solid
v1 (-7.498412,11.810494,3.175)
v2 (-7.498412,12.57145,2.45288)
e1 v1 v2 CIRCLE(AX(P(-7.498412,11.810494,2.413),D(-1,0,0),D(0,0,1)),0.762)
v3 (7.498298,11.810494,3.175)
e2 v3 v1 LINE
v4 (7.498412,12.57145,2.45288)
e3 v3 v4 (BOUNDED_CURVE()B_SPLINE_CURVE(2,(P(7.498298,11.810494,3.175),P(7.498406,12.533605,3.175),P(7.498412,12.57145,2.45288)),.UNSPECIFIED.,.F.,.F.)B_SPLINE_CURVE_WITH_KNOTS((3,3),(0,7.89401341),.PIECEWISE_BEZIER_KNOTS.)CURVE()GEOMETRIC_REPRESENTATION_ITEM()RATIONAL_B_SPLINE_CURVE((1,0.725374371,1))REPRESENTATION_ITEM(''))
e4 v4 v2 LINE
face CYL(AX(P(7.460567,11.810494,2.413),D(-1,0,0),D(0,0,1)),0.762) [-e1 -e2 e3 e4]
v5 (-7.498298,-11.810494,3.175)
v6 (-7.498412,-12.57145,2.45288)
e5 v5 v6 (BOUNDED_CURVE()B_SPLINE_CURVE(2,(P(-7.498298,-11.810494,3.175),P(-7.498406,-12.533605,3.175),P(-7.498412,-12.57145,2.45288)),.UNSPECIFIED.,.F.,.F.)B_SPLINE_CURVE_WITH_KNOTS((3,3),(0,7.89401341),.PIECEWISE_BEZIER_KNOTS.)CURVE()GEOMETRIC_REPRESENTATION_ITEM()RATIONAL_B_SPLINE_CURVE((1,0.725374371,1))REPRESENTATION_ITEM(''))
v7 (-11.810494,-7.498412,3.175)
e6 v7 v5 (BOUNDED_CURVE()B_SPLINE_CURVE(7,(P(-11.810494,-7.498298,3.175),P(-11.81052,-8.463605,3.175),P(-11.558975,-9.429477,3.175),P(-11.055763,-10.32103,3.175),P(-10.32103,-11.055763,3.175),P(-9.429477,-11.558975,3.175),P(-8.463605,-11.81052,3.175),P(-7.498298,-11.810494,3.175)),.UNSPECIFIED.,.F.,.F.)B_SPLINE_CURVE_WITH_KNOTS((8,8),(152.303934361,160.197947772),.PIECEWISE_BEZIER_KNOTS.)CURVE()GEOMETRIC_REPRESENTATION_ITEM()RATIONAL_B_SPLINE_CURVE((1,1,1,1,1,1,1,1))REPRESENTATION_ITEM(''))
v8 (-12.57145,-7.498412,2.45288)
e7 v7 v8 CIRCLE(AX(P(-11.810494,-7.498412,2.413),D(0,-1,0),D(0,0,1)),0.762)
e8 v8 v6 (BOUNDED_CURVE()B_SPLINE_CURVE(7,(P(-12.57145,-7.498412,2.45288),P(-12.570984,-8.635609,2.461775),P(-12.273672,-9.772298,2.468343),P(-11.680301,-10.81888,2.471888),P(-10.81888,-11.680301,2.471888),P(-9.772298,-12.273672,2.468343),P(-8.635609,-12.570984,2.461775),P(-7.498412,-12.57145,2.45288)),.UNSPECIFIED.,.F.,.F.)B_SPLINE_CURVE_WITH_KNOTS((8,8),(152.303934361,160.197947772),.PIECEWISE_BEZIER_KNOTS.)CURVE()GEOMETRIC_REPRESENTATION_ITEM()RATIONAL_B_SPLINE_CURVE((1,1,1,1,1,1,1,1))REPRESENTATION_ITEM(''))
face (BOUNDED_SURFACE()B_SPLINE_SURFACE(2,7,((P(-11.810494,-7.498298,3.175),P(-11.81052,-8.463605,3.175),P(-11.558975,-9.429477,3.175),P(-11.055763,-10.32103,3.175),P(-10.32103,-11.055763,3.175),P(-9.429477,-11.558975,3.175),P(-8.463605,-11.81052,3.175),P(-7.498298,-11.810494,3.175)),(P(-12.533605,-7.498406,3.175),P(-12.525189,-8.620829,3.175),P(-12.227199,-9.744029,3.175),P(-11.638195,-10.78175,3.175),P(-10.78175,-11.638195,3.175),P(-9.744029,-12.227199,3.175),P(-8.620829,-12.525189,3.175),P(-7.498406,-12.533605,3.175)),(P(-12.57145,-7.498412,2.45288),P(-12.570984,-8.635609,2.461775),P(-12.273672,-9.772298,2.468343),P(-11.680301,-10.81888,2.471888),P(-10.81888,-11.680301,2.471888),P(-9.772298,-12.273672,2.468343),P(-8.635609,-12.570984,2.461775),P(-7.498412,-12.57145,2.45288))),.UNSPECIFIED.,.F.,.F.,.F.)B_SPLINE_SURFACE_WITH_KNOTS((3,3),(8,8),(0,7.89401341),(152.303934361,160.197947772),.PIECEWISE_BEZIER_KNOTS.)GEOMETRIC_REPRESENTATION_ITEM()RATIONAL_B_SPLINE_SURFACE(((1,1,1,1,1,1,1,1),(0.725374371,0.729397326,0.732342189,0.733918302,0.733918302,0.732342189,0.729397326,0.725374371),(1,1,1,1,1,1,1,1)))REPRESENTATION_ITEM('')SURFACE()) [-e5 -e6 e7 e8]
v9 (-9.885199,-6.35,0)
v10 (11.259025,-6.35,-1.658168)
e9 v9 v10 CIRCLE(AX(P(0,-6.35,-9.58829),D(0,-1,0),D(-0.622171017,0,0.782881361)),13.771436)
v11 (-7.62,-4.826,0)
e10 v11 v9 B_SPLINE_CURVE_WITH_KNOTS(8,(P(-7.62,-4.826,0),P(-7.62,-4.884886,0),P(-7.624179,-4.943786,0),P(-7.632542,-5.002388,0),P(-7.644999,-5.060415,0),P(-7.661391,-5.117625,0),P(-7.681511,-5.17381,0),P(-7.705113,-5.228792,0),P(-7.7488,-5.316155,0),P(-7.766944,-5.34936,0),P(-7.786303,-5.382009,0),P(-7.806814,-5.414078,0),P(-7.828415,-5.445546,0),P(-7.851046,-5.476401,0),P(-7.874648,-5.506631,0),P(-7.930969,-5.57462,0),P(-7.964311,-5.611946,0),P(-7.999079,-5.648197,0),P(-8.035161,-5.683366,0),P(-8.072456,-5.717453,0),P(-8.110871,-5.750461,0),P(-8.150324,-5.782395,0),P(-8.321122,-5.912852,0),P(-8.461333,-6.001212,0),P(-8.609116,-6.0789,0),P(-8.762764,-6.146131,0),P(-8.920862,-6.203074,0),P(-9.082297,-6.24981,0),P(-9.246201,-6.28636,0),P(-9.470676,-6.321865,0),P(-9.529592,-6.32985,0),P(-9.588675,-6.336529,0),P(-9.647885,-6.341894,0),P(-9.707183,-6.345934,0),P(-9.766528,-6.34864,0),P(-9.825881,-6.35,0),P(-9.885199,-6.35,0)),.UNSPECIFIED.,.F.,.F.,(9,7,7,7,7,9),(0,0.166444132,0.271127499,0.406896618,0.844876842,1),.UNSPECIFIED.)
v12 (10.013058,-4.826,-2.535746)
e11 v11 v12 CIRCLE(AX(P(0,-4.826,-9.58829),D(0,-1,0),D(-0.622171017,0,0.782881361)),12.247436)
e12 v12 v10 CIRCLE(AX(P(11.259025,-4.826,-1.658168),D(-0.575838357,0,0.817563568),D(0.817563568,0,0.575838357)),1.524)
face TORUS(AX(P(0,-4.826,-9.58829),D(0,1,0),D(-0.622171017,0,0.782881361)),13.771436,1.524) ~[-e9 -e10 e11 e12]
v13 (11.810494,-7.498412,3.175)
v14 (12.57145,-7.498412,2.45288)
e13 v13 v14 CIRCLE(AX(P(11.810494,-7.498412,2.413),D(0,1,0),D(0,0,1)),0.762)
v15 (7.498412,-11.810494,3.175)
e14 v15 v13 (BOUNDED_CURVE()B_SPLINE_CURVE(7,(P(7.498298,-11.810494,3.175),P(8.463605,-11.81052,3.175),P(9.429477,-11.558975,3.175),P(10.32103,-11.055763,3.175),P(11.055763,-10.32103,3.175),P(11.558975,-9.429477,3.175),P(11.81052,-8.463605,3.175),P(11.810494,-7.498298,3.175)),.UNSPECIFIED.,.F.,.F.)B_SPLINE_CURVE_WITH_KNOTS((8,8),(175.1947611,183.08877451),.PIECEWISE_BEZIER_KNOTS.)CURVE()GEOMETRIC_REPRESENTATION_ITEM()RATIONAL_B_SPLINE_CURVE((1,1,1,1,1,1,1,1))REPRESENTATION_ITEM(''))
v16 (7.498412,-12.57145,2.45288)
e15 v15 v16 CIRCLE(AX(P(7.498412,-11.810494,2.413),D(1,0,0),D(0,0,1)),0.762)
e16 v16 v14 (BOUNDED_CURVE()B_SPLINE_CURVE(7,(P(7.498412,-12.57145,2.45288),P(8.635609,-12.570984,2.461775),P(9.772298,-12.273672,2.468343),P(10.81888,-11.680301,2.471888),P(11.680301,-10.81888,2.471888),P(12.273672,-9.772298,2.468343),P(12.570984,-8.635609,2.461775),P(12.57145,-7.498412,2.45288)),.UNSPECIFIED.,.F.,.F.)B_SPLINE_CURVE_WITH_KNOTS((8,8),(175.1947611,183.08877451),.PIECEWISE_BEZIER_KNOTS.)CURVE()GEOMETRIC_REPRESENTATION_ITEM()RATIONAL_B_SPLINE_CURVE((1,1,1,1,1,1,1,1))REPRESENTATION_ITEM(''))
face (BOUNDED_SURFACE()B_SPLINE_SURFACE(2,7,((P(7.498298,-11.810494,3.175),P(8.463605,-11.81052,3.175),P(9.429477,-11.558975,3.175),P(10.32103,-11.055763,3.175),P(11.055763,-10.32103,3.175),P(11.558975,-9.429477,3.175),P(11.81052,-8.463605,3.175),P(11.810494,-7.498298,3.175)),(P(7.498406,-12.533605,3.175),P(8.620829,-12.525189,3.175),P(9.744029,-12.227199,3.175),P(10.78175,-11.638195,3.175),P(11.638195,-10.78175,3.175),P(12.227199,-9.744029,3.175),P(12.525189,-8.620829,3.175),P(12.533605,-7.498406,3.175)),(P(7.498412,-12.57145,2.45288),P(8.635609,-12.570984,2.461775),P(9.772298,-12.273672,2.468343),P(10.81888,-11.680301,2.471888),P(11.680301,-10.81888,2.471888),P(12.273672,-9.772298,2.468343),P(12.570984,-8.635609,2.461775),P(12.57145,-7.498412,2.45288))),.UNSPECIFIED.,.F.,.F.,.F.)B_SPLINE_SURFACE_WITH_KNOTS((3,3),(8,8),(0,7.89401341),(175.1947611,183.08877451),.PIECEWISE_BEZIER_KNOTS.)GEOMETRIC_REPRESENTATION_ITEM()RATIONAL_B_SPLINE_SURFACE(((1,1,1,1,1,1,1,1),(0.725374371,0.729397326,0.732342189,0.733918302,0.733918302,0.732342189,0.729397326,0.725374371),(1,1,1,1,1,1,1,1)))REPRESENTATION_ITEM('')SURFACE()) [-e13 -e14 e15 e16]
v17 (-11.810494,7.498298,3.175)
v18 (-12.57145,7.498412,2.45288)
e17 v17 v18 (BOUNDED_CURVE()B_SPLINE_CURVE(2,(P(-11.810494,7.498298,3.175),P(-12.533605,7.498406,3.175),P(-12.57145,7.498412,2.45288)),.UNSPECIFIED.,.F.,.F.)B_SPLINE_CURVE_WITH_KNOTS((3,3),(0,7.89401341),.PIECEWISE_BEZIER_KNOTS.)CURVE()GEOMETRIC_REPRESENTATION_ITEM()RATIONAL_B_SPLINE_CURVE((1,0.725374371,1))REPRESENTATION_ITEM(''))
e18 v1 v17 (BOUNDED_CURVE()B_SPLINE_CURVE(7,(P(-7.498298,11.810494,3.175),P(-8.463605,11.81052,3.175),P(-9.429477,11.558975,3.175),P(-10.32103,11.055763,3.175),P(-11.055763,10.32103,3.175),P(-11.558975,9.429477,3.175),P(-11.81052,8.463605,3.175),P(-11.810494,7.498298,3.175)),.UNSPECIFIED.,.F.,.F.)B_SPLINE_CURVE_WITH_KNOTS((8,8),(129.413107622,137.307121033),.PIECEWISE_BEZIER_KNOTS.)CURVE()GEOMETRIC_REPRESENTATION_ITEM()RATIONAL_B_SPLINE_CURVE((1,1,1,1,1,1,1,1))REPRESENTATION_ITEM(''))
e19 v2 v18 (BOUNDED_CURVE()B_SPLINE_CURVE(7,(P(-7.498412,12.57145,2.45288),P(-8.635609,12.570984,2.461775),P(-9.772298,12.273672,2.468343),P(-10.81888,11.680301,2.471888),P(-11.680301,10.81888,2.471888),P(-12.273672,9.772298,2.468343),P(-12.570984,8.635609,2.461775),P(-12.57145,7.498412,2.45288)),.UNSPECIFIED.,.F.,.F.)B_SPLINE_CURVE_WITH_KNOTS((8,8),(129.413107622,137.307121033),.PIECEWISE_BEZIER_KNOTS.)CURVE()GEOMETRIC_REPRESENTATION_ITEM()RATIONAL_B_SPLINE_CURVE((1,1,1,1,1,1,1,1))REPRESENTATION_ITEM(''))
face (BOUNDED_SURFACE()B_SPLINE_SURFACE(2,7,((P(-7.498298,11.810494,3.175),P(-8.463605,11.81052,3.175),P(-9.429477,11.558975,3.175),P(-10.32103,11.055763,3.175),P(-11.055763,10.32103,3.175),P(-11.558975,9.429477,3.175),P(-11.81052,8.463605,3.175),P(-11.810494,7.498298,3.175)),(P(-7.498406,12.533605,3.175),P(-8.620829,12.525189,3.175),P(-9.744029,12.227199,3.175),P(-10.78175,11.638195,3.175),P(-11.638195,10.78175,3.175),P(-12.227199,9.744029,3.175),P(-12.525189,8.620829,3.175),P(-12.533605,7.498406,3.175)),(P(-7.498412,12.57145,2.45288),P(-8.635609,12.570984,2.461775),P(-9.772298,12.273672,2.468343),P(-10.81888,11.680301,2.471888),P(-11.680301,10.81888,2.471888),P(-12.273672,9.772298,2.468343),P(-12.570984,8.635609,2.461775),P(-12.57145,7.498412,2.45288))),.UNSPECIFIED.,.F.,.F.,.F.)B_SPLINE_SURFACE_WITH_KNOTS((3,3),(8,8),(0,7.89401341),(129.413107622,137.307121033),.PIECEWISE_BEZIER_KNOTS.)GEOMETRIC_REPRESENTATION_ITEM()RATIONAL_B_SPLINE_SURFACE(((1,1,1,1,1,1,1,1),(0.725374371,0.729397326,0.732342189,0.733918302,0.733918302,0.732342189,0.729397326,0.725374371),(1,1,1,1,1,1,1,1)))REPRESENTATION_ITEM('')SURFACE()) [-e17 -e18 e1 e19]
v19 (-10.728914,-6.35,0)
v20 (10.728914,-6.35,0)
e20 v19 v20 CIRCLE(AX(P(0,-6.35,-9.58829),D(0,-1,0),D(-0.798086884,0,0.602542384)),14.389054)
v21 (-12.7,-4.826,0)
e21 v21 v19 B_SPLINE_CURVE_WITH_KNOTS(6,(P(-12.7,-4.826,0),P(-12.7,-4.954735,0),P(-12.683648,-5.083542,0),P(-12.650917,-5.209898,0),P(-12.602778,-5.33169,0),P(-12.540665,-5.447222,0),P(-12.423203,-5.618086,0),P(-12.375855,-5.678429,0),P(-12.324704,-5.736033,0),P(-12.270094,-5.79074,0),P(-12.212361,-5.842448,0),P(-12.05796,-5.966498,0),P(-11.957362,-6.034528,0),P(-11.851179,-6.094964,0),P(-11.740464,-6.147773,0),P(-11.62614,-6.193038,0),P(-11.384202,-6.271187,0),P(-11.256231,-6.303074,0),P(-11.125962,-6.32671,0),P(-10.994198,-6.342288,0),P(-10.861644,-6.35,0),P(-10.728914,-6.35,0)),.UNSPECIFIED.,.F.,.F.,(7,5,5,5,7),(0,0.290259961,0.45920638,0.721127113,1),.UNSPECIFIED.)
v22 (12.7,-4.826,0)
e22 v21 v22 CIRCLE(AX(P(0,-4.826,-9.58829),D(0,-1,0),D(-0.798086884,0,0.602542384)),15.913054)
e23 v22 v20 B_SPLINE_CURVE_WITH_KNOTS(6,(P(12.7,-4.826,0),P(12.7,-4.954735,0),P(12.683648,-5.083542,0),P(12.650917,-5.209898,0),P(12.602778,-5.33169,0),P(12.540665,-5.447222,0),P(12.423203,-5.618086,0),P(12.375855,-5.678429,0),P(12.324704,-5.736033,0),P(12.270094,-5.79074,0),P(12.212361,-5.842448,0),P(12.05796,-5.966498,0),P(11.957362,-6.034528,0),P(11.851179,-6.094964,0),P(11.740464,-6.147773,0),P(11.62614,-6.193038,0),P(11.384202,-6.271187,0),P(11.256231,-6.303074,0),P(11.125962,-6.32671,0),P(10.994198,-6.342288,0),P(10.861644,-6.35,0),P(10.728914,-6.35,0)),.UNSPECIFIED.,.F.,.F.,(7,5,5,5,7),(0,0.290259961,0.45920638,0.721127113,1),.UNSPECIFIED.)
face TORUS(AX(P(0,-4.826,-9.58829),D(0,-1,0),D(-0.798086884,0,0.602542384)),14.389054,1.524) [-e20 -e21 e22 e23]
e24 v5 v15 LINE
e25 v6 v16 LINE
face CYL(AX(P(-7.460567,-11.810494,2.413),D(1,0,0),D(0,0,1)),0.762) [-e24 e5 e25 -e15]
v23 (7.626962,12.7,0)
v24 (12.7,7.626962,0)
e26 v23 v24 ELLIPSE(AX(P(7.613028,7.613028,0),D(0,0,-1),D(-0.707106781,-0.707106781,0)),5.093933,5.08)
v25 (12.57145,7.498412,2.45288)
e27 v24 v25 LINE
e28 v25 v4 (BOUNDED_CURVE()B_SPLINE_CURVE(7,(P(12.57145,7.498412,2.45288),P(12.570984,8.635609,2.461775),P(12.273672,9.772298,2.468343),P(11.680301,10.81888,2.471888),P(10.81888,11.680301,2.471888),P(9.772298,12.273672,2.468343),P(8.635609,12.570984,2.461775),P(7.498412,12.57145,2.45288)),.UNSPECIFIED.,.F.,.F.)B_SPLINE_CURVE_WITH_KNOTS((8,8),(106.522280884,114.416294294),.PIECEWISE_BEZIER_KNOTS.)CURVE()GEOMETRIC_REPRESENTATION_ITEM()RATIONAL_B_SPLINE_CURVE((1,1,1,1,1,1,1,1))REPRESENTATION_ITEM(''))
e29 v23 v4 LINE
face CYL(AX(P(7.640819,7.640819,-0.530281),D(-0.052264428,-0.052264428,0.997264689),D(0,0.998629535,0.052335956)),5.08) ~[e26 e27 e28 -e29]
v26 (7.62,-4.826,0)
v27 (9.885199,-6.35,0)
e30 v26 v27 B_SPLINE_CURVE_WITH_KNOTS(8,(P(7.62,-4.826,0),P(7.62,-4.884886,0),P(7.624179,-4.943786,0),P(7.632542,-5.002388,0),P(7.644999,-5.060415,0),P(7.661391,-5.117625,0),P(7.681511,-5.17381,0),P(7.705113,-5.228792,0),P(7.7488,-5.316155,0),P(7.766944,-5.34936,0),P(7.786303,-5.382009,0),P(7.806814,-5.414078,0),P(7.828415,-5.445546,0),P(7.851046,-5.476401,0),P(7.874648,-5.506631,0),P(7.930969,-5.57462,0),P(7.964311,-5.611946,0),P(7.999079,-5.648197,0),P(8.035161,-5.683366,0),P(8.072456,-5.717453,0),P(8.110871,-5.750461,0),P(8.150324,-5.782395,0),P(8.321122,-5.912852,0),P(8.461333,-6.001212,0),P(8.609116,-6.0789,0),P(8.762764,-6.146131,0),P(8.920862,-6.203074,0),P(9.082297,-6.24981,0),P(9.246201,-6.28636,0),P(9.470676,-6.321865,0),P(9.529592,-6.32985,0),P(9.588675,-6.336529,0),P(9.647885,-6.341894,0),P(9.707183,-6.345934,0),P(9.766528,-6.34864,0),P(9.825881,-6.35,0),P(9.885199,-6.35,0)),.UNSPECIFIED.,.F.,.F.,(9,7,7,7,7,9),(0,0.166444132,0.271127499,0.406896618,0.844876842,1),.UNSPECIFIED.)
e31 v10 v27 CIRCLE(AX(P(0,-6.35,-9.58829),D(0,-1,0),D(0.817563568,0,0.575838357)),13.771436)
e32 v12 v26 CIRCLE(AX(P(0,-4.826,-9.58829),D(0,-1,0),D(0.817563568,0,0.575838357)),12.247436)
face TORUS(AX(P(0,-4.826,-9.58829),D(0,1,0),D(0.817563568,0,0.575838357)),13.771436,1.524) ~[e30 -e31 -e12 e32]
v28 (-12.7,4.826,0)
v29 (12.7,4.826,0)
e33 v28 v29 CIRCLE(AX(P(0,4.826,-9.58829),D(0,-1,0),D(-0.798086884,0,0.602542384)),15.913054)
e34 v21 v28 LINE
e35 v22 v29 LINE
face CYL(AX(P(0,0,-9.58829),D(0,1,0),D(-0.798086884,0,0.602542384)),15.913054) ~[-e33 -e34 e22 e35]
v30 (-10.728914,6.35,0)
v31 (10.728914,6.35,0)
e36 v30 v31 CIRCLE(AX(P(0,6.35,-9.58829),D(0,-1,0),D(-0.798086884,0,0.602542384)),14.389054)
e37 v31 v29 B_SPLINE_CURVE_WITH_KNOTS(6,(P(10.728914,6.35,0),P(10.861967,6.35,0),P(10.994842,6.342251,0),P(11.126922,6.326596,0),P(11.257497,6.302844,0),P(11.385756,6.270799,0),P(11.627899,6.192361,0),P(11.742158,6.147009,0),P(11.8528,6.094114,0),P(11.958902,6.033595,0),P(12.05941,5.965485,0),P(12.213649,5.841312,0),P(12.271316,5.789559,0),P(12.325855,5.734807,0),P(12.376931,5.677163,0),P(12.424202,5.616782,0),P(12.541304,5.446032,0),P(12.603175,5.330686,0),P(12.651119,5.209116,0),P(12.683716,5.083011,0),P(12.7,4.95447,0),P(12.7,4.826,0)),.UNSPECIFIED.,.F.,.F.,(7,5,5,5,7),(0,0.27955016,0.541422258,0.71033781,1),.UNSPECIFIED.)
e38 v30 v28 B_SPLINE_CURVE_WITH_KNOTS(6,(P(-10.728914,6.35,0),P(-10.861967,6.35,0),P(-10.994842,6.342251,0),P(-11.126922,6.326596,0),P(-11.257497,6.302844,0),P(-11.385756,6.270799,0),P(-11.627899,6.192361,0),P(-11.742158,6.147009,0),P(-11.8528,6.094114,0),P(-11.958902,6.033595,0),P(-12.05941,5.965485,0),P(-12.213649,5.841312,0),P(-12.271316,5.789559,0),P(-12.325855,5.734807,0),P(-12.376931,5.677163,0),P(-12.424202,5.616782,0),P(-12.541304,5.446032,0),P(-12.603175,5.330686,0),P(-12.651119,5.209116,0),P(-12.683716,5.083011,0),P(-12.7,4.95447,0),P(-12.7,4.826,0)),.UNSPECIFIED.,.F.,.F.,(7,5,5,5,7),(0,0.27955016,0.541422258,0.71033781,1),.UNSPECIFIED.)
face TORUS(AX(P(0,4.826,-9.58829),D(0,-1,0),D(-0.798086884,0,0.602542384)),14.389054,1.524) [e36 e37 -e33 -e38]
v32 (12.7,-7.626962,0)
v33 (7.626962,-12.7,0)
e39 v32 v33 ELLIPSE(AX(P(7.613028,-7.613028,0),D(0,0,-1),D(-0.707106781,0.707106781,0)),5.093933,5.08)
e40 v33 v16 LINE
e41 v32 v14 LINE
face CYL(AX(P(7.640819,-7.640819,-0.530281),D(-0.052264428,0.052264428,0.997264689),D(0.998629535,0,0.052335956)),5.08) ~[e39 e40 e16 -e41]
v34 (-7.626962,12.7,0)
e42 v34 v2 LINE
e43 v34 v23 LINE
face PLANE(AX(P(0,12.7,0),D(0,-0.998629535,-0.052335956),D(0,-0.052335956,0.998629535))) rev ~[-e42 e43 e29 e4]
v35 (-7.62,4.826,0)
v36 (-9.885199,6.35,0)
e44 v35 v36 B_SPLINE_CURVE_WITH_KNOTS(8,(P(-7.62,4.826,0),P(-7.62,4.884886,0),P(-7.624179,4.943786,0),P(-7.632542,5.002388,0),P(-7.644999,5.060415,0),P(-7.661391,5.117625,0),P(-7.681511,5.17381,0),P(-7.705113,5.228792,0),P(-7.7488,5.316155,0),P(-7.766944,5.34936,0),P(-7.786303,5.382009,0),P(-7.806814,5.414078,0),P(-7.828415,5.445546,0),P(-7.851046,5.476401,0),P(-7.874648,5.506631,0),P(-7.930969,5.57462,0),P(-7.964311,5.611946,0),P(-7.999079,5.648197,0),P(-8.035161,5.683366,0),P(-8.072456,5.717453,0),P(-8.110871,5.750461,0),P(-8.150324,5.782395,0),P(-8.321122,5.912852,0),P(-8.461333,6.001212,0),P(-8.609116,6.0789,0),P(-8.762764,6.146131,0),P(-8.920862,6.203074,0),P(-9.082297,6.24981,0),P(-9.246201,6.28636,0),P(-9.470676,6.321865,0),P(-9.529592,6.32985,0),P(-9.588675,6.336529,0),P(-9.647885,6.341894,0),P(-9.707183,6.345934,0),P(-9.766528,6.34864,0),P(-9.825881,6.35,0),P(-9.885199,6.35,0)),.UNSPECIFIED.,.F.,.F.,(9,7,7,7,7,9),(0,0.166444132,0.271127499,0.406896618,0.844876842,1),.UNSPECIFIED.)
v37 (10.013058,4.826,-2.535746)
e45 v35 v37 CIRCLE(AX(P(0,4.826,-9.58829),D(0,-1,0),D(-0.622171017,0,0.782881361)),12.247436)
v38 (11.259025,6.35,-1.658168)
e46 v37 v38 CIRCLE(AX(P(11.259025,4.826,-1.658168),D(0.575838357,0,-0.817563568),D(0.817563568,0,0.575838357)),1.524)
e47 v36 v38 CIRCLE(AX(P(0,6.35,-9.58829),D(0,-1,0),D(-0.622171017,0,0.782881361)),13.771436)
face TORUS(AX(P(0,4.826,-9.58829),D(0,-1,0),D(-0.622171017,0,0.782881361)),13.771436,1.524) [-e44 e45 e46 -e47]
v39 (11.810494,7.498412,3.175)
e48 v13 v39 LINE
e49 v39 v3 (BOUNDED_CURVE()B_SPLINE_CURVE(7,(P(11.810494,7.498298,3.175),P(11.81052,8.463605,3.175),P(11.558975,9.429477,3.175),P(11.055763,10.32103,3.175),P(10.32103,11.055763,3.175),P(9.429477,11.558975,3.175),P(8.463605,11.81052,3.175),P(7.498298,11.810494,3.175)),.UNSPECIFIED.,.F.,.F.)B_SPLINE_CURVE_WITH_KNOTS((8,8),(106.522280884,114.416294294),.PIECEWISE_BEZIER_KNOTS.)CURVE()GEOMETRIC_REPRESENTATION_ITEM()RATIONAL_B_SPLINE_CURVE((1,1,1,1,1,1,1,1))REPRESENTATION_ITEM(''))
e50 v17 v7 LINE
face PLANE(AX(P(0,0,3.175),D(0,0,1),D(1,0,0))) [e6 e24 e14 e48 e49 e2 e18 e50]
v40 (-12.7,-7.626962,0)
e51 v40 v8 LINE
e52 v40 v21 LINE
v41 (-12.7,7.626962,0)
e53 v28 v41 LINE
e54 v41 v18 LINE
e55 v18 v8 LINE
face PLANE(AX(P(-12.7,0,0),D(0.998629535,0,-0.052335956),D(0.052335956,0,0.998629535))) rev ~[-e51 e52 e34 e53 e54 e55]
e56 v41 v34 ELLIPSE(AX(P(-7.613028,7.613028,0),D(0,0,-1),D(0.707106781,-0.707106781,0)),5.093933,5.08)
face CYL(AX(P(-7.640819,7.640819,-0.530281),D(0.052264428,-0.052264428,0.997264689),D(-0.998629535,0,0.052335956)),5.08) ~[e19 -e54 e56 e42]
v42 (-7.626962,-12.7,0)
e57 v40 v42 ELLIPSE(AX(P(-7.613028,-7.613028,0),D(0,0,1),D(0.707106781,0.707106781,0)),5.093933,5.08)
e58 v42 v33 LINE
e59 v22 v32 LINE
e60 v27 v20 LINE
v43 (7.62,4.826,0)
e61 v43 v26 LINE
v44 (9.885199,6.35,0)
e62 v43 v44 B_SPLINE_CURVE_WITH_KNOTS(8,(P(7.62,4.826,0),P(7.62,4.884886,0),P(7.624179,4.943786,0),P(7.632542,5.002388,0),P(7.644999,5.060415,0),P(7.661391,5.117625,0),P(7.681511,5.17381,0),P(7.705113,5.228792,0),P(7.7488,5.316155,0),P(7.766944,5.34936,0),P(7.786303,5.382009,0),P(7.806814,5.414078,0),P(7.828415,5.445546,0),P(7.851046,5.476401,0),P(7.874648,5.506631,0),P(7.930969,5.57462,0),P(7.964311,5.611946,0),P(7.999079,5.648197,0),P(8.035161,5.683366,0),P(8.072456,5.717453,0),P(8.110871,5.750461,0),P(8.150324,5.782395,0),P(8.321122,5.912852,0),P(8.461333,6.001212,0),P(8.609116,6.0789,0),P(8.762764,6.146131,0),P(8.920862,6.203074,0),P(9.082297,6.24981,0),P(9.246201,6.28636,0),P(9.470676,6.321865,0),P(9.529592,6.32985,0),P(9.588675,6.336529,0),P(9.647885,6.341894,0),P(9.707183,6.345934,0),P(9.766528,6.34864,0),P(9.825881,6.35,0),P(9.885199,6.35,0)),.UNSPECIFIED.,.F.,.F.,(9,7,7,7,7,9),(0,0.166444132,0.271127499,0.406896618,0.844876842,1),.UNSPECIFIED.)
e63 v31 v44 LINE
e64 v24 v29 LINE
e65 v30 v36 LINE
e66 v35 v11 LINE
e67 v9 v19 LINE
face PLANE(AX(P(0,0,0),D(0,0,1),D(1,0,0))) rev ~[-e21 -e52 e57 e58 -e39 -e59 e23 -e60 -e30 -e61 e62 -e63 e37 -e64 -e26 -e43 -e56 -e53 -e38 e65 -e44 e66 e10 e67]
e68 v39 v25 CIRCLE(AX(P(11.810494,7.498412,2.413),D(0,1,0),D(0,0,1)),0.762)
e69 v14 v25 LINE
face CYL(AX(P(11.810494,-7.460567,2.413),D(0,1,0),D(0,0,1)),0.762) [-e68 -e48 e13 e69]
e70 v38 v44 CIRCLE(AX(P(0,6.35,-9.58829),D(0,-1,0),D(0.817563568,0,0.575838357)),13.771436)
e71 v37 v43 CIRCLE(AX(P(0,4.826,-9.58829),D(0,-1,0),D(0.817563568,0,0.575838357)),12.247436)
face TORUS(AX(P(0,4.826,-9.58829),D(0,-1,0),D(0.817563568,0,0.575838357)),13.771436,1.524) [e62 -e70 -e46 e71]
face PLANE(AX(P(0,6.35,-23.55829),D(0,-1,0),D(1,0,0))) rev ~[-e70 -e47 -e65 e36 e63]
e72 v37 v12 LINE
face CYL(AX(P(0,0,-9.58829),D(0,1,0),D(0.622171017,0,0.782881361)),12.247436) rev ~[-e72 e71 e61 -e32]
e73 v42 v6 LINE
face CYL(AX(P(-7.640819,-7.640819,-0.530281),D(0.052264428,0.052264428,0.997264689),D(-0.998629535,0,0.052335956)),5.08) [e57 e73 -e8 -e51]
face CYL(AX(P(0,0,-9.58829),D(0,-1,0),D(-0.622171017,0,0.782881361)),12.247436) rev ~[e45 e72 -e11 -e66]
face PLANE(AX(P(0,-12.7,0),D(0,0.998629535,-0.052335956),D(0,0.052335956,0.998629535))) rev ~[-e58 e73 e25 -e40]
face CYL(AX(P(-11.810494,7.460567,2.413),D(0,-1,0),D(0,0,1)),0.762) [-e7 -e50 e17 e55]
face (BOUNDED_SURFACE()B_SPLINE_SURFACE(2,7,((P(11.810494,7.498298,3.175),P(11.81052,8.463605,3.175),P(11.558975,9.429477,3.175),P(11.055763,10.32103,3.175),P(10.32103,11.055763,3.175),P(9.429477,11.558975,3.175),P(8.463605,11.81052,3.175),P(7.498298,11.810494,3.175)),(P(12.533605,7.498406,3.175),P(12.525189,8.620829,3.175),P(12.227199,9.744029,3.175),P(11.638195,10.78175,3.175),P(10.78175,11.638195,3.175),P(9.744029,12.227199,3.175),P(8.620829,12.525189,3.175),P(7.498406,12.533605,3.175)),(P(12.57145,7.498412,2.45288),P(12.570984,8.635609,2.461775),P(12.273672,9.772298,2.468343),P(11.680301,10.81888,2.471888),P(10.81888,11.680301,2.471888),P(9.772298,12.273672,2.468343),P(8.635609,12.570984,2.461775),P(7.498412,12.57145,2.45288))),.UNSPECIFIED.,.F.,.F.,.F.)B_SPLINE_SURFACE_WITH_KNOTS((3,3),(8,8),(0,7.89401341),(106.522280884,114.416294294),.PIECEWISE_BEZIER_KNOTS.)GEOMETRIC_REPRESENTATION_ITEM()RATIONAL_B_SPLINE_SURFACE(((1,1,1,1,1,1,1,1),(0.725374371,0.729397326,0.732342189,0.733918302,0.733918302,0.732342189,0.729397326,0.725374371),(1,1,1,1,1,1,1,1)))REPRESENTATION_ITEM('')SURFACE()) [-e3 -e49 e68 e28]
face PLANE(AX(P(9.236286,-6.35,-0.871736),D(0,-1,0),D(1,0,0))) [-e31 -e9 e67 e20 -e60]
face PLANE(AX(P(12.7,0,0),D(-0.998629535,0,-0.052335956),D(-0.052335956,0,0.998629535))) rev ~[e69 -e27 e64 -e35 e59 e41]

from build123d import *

# Parameters (mm, degrees)
F0_W          = 25.4
F0_H          = 25.4
F1_DEPTH      = 3.175
F1_TAPER      = 3
F3_W          = 5.08
F3_H          = 12.7
F6_DEPTH      = 6.35
F6_DEPTH_BACK = 6.35
F7_R          = 5.08
F8_R          = 1.524
F9_R          = 0.762


with BuildPart() as f1:
    # F0 (on Top) → F1 (new body)
    with BuildSketch(Plane.XY):
        Rectangle(F0_W, F0_H)
    extrude(amount=F1_DEPTH, taper=F1_TAPER)

    # F4: sweep along a path in F2
    with BuildLine(Plane.XZ) as f4_path:
        ThreePointArc((-10.16, 0), (0, -23.5582897328), (10.16, 0))
    # F3 (on face) → F4 (sweep)
    with BuildSketch(Plane(origin=(0, 0, 0), x_dir=(1, 0, 0), z_dir=(0, 0, -1))):
        with Locations((-10.16, 0)):
            Rectangle(F3_W, F3_H)
    sweep(path=f4_path.line)

    # F5 (on Front) → F6 (join, two sides)
    with BuildSketch(Plane.XZ) as f6_sk:
        with BuildLine():
            Line((10.0130578512, -2.535746045), (10.16, 0))
            Line((10.16, 0), (7.62, 0))
            ThreePointArc((7.62, 0), (8.9072265211, -1.1822790439), (10.0130578512, -2.535746045))
        make_face()
    extrude(amount=F6_DEPTH)
    extrude(f6_sk.sketch, amount=-F6_DEPTH_BACK)

    # F7
    f7_edges = [f1.edges().sort_by_distance(p)[0] for p in [
        (-12.616803, 12.616803, 1.5875),
        (12.616803, 12.616803, 1.5875),
        (12.616803, -12.616803, 1.5875),
        (-12.616803, -12.616803, 1.5875),
    ]]
    fillet(f7_edges, radius=F7_R)

    # F8
    f8_edges = [f1.edges().sort_by_distance(p)[0] for p in [
        (-1.743325, -6.35, -21.711017),
        (8.907227, -6.35, -1.182279),
        (-1.743325, 6.35, -21.711017),
        (0, -6.35, -25.501344),
        (0, 6.35, -25.501344),
        (8.907227, 6.35, -1.182279),
    ]]
    fillet(f8_edges, radius=F8_R)

    # F9
    f9_edges = [f1.edges().sort_by_distance(p)[0] for p in [
        (12.533605, 0, 3.175),
        (11.048589, -11.048589, 3.175),
        (11.048589, 11.048589, 3.175),
        (0, -12.533605, 3.175),
        (0, 12.533605, 3.175),
        (-11.048589, -11.048589, 3.175),
        (-11.048589, 11.048589, 3.175),
        (-12.533605, 0, 3.175),
    ]]
    fillet(f9_edges, radius=F9_R)


solid = f1.part
